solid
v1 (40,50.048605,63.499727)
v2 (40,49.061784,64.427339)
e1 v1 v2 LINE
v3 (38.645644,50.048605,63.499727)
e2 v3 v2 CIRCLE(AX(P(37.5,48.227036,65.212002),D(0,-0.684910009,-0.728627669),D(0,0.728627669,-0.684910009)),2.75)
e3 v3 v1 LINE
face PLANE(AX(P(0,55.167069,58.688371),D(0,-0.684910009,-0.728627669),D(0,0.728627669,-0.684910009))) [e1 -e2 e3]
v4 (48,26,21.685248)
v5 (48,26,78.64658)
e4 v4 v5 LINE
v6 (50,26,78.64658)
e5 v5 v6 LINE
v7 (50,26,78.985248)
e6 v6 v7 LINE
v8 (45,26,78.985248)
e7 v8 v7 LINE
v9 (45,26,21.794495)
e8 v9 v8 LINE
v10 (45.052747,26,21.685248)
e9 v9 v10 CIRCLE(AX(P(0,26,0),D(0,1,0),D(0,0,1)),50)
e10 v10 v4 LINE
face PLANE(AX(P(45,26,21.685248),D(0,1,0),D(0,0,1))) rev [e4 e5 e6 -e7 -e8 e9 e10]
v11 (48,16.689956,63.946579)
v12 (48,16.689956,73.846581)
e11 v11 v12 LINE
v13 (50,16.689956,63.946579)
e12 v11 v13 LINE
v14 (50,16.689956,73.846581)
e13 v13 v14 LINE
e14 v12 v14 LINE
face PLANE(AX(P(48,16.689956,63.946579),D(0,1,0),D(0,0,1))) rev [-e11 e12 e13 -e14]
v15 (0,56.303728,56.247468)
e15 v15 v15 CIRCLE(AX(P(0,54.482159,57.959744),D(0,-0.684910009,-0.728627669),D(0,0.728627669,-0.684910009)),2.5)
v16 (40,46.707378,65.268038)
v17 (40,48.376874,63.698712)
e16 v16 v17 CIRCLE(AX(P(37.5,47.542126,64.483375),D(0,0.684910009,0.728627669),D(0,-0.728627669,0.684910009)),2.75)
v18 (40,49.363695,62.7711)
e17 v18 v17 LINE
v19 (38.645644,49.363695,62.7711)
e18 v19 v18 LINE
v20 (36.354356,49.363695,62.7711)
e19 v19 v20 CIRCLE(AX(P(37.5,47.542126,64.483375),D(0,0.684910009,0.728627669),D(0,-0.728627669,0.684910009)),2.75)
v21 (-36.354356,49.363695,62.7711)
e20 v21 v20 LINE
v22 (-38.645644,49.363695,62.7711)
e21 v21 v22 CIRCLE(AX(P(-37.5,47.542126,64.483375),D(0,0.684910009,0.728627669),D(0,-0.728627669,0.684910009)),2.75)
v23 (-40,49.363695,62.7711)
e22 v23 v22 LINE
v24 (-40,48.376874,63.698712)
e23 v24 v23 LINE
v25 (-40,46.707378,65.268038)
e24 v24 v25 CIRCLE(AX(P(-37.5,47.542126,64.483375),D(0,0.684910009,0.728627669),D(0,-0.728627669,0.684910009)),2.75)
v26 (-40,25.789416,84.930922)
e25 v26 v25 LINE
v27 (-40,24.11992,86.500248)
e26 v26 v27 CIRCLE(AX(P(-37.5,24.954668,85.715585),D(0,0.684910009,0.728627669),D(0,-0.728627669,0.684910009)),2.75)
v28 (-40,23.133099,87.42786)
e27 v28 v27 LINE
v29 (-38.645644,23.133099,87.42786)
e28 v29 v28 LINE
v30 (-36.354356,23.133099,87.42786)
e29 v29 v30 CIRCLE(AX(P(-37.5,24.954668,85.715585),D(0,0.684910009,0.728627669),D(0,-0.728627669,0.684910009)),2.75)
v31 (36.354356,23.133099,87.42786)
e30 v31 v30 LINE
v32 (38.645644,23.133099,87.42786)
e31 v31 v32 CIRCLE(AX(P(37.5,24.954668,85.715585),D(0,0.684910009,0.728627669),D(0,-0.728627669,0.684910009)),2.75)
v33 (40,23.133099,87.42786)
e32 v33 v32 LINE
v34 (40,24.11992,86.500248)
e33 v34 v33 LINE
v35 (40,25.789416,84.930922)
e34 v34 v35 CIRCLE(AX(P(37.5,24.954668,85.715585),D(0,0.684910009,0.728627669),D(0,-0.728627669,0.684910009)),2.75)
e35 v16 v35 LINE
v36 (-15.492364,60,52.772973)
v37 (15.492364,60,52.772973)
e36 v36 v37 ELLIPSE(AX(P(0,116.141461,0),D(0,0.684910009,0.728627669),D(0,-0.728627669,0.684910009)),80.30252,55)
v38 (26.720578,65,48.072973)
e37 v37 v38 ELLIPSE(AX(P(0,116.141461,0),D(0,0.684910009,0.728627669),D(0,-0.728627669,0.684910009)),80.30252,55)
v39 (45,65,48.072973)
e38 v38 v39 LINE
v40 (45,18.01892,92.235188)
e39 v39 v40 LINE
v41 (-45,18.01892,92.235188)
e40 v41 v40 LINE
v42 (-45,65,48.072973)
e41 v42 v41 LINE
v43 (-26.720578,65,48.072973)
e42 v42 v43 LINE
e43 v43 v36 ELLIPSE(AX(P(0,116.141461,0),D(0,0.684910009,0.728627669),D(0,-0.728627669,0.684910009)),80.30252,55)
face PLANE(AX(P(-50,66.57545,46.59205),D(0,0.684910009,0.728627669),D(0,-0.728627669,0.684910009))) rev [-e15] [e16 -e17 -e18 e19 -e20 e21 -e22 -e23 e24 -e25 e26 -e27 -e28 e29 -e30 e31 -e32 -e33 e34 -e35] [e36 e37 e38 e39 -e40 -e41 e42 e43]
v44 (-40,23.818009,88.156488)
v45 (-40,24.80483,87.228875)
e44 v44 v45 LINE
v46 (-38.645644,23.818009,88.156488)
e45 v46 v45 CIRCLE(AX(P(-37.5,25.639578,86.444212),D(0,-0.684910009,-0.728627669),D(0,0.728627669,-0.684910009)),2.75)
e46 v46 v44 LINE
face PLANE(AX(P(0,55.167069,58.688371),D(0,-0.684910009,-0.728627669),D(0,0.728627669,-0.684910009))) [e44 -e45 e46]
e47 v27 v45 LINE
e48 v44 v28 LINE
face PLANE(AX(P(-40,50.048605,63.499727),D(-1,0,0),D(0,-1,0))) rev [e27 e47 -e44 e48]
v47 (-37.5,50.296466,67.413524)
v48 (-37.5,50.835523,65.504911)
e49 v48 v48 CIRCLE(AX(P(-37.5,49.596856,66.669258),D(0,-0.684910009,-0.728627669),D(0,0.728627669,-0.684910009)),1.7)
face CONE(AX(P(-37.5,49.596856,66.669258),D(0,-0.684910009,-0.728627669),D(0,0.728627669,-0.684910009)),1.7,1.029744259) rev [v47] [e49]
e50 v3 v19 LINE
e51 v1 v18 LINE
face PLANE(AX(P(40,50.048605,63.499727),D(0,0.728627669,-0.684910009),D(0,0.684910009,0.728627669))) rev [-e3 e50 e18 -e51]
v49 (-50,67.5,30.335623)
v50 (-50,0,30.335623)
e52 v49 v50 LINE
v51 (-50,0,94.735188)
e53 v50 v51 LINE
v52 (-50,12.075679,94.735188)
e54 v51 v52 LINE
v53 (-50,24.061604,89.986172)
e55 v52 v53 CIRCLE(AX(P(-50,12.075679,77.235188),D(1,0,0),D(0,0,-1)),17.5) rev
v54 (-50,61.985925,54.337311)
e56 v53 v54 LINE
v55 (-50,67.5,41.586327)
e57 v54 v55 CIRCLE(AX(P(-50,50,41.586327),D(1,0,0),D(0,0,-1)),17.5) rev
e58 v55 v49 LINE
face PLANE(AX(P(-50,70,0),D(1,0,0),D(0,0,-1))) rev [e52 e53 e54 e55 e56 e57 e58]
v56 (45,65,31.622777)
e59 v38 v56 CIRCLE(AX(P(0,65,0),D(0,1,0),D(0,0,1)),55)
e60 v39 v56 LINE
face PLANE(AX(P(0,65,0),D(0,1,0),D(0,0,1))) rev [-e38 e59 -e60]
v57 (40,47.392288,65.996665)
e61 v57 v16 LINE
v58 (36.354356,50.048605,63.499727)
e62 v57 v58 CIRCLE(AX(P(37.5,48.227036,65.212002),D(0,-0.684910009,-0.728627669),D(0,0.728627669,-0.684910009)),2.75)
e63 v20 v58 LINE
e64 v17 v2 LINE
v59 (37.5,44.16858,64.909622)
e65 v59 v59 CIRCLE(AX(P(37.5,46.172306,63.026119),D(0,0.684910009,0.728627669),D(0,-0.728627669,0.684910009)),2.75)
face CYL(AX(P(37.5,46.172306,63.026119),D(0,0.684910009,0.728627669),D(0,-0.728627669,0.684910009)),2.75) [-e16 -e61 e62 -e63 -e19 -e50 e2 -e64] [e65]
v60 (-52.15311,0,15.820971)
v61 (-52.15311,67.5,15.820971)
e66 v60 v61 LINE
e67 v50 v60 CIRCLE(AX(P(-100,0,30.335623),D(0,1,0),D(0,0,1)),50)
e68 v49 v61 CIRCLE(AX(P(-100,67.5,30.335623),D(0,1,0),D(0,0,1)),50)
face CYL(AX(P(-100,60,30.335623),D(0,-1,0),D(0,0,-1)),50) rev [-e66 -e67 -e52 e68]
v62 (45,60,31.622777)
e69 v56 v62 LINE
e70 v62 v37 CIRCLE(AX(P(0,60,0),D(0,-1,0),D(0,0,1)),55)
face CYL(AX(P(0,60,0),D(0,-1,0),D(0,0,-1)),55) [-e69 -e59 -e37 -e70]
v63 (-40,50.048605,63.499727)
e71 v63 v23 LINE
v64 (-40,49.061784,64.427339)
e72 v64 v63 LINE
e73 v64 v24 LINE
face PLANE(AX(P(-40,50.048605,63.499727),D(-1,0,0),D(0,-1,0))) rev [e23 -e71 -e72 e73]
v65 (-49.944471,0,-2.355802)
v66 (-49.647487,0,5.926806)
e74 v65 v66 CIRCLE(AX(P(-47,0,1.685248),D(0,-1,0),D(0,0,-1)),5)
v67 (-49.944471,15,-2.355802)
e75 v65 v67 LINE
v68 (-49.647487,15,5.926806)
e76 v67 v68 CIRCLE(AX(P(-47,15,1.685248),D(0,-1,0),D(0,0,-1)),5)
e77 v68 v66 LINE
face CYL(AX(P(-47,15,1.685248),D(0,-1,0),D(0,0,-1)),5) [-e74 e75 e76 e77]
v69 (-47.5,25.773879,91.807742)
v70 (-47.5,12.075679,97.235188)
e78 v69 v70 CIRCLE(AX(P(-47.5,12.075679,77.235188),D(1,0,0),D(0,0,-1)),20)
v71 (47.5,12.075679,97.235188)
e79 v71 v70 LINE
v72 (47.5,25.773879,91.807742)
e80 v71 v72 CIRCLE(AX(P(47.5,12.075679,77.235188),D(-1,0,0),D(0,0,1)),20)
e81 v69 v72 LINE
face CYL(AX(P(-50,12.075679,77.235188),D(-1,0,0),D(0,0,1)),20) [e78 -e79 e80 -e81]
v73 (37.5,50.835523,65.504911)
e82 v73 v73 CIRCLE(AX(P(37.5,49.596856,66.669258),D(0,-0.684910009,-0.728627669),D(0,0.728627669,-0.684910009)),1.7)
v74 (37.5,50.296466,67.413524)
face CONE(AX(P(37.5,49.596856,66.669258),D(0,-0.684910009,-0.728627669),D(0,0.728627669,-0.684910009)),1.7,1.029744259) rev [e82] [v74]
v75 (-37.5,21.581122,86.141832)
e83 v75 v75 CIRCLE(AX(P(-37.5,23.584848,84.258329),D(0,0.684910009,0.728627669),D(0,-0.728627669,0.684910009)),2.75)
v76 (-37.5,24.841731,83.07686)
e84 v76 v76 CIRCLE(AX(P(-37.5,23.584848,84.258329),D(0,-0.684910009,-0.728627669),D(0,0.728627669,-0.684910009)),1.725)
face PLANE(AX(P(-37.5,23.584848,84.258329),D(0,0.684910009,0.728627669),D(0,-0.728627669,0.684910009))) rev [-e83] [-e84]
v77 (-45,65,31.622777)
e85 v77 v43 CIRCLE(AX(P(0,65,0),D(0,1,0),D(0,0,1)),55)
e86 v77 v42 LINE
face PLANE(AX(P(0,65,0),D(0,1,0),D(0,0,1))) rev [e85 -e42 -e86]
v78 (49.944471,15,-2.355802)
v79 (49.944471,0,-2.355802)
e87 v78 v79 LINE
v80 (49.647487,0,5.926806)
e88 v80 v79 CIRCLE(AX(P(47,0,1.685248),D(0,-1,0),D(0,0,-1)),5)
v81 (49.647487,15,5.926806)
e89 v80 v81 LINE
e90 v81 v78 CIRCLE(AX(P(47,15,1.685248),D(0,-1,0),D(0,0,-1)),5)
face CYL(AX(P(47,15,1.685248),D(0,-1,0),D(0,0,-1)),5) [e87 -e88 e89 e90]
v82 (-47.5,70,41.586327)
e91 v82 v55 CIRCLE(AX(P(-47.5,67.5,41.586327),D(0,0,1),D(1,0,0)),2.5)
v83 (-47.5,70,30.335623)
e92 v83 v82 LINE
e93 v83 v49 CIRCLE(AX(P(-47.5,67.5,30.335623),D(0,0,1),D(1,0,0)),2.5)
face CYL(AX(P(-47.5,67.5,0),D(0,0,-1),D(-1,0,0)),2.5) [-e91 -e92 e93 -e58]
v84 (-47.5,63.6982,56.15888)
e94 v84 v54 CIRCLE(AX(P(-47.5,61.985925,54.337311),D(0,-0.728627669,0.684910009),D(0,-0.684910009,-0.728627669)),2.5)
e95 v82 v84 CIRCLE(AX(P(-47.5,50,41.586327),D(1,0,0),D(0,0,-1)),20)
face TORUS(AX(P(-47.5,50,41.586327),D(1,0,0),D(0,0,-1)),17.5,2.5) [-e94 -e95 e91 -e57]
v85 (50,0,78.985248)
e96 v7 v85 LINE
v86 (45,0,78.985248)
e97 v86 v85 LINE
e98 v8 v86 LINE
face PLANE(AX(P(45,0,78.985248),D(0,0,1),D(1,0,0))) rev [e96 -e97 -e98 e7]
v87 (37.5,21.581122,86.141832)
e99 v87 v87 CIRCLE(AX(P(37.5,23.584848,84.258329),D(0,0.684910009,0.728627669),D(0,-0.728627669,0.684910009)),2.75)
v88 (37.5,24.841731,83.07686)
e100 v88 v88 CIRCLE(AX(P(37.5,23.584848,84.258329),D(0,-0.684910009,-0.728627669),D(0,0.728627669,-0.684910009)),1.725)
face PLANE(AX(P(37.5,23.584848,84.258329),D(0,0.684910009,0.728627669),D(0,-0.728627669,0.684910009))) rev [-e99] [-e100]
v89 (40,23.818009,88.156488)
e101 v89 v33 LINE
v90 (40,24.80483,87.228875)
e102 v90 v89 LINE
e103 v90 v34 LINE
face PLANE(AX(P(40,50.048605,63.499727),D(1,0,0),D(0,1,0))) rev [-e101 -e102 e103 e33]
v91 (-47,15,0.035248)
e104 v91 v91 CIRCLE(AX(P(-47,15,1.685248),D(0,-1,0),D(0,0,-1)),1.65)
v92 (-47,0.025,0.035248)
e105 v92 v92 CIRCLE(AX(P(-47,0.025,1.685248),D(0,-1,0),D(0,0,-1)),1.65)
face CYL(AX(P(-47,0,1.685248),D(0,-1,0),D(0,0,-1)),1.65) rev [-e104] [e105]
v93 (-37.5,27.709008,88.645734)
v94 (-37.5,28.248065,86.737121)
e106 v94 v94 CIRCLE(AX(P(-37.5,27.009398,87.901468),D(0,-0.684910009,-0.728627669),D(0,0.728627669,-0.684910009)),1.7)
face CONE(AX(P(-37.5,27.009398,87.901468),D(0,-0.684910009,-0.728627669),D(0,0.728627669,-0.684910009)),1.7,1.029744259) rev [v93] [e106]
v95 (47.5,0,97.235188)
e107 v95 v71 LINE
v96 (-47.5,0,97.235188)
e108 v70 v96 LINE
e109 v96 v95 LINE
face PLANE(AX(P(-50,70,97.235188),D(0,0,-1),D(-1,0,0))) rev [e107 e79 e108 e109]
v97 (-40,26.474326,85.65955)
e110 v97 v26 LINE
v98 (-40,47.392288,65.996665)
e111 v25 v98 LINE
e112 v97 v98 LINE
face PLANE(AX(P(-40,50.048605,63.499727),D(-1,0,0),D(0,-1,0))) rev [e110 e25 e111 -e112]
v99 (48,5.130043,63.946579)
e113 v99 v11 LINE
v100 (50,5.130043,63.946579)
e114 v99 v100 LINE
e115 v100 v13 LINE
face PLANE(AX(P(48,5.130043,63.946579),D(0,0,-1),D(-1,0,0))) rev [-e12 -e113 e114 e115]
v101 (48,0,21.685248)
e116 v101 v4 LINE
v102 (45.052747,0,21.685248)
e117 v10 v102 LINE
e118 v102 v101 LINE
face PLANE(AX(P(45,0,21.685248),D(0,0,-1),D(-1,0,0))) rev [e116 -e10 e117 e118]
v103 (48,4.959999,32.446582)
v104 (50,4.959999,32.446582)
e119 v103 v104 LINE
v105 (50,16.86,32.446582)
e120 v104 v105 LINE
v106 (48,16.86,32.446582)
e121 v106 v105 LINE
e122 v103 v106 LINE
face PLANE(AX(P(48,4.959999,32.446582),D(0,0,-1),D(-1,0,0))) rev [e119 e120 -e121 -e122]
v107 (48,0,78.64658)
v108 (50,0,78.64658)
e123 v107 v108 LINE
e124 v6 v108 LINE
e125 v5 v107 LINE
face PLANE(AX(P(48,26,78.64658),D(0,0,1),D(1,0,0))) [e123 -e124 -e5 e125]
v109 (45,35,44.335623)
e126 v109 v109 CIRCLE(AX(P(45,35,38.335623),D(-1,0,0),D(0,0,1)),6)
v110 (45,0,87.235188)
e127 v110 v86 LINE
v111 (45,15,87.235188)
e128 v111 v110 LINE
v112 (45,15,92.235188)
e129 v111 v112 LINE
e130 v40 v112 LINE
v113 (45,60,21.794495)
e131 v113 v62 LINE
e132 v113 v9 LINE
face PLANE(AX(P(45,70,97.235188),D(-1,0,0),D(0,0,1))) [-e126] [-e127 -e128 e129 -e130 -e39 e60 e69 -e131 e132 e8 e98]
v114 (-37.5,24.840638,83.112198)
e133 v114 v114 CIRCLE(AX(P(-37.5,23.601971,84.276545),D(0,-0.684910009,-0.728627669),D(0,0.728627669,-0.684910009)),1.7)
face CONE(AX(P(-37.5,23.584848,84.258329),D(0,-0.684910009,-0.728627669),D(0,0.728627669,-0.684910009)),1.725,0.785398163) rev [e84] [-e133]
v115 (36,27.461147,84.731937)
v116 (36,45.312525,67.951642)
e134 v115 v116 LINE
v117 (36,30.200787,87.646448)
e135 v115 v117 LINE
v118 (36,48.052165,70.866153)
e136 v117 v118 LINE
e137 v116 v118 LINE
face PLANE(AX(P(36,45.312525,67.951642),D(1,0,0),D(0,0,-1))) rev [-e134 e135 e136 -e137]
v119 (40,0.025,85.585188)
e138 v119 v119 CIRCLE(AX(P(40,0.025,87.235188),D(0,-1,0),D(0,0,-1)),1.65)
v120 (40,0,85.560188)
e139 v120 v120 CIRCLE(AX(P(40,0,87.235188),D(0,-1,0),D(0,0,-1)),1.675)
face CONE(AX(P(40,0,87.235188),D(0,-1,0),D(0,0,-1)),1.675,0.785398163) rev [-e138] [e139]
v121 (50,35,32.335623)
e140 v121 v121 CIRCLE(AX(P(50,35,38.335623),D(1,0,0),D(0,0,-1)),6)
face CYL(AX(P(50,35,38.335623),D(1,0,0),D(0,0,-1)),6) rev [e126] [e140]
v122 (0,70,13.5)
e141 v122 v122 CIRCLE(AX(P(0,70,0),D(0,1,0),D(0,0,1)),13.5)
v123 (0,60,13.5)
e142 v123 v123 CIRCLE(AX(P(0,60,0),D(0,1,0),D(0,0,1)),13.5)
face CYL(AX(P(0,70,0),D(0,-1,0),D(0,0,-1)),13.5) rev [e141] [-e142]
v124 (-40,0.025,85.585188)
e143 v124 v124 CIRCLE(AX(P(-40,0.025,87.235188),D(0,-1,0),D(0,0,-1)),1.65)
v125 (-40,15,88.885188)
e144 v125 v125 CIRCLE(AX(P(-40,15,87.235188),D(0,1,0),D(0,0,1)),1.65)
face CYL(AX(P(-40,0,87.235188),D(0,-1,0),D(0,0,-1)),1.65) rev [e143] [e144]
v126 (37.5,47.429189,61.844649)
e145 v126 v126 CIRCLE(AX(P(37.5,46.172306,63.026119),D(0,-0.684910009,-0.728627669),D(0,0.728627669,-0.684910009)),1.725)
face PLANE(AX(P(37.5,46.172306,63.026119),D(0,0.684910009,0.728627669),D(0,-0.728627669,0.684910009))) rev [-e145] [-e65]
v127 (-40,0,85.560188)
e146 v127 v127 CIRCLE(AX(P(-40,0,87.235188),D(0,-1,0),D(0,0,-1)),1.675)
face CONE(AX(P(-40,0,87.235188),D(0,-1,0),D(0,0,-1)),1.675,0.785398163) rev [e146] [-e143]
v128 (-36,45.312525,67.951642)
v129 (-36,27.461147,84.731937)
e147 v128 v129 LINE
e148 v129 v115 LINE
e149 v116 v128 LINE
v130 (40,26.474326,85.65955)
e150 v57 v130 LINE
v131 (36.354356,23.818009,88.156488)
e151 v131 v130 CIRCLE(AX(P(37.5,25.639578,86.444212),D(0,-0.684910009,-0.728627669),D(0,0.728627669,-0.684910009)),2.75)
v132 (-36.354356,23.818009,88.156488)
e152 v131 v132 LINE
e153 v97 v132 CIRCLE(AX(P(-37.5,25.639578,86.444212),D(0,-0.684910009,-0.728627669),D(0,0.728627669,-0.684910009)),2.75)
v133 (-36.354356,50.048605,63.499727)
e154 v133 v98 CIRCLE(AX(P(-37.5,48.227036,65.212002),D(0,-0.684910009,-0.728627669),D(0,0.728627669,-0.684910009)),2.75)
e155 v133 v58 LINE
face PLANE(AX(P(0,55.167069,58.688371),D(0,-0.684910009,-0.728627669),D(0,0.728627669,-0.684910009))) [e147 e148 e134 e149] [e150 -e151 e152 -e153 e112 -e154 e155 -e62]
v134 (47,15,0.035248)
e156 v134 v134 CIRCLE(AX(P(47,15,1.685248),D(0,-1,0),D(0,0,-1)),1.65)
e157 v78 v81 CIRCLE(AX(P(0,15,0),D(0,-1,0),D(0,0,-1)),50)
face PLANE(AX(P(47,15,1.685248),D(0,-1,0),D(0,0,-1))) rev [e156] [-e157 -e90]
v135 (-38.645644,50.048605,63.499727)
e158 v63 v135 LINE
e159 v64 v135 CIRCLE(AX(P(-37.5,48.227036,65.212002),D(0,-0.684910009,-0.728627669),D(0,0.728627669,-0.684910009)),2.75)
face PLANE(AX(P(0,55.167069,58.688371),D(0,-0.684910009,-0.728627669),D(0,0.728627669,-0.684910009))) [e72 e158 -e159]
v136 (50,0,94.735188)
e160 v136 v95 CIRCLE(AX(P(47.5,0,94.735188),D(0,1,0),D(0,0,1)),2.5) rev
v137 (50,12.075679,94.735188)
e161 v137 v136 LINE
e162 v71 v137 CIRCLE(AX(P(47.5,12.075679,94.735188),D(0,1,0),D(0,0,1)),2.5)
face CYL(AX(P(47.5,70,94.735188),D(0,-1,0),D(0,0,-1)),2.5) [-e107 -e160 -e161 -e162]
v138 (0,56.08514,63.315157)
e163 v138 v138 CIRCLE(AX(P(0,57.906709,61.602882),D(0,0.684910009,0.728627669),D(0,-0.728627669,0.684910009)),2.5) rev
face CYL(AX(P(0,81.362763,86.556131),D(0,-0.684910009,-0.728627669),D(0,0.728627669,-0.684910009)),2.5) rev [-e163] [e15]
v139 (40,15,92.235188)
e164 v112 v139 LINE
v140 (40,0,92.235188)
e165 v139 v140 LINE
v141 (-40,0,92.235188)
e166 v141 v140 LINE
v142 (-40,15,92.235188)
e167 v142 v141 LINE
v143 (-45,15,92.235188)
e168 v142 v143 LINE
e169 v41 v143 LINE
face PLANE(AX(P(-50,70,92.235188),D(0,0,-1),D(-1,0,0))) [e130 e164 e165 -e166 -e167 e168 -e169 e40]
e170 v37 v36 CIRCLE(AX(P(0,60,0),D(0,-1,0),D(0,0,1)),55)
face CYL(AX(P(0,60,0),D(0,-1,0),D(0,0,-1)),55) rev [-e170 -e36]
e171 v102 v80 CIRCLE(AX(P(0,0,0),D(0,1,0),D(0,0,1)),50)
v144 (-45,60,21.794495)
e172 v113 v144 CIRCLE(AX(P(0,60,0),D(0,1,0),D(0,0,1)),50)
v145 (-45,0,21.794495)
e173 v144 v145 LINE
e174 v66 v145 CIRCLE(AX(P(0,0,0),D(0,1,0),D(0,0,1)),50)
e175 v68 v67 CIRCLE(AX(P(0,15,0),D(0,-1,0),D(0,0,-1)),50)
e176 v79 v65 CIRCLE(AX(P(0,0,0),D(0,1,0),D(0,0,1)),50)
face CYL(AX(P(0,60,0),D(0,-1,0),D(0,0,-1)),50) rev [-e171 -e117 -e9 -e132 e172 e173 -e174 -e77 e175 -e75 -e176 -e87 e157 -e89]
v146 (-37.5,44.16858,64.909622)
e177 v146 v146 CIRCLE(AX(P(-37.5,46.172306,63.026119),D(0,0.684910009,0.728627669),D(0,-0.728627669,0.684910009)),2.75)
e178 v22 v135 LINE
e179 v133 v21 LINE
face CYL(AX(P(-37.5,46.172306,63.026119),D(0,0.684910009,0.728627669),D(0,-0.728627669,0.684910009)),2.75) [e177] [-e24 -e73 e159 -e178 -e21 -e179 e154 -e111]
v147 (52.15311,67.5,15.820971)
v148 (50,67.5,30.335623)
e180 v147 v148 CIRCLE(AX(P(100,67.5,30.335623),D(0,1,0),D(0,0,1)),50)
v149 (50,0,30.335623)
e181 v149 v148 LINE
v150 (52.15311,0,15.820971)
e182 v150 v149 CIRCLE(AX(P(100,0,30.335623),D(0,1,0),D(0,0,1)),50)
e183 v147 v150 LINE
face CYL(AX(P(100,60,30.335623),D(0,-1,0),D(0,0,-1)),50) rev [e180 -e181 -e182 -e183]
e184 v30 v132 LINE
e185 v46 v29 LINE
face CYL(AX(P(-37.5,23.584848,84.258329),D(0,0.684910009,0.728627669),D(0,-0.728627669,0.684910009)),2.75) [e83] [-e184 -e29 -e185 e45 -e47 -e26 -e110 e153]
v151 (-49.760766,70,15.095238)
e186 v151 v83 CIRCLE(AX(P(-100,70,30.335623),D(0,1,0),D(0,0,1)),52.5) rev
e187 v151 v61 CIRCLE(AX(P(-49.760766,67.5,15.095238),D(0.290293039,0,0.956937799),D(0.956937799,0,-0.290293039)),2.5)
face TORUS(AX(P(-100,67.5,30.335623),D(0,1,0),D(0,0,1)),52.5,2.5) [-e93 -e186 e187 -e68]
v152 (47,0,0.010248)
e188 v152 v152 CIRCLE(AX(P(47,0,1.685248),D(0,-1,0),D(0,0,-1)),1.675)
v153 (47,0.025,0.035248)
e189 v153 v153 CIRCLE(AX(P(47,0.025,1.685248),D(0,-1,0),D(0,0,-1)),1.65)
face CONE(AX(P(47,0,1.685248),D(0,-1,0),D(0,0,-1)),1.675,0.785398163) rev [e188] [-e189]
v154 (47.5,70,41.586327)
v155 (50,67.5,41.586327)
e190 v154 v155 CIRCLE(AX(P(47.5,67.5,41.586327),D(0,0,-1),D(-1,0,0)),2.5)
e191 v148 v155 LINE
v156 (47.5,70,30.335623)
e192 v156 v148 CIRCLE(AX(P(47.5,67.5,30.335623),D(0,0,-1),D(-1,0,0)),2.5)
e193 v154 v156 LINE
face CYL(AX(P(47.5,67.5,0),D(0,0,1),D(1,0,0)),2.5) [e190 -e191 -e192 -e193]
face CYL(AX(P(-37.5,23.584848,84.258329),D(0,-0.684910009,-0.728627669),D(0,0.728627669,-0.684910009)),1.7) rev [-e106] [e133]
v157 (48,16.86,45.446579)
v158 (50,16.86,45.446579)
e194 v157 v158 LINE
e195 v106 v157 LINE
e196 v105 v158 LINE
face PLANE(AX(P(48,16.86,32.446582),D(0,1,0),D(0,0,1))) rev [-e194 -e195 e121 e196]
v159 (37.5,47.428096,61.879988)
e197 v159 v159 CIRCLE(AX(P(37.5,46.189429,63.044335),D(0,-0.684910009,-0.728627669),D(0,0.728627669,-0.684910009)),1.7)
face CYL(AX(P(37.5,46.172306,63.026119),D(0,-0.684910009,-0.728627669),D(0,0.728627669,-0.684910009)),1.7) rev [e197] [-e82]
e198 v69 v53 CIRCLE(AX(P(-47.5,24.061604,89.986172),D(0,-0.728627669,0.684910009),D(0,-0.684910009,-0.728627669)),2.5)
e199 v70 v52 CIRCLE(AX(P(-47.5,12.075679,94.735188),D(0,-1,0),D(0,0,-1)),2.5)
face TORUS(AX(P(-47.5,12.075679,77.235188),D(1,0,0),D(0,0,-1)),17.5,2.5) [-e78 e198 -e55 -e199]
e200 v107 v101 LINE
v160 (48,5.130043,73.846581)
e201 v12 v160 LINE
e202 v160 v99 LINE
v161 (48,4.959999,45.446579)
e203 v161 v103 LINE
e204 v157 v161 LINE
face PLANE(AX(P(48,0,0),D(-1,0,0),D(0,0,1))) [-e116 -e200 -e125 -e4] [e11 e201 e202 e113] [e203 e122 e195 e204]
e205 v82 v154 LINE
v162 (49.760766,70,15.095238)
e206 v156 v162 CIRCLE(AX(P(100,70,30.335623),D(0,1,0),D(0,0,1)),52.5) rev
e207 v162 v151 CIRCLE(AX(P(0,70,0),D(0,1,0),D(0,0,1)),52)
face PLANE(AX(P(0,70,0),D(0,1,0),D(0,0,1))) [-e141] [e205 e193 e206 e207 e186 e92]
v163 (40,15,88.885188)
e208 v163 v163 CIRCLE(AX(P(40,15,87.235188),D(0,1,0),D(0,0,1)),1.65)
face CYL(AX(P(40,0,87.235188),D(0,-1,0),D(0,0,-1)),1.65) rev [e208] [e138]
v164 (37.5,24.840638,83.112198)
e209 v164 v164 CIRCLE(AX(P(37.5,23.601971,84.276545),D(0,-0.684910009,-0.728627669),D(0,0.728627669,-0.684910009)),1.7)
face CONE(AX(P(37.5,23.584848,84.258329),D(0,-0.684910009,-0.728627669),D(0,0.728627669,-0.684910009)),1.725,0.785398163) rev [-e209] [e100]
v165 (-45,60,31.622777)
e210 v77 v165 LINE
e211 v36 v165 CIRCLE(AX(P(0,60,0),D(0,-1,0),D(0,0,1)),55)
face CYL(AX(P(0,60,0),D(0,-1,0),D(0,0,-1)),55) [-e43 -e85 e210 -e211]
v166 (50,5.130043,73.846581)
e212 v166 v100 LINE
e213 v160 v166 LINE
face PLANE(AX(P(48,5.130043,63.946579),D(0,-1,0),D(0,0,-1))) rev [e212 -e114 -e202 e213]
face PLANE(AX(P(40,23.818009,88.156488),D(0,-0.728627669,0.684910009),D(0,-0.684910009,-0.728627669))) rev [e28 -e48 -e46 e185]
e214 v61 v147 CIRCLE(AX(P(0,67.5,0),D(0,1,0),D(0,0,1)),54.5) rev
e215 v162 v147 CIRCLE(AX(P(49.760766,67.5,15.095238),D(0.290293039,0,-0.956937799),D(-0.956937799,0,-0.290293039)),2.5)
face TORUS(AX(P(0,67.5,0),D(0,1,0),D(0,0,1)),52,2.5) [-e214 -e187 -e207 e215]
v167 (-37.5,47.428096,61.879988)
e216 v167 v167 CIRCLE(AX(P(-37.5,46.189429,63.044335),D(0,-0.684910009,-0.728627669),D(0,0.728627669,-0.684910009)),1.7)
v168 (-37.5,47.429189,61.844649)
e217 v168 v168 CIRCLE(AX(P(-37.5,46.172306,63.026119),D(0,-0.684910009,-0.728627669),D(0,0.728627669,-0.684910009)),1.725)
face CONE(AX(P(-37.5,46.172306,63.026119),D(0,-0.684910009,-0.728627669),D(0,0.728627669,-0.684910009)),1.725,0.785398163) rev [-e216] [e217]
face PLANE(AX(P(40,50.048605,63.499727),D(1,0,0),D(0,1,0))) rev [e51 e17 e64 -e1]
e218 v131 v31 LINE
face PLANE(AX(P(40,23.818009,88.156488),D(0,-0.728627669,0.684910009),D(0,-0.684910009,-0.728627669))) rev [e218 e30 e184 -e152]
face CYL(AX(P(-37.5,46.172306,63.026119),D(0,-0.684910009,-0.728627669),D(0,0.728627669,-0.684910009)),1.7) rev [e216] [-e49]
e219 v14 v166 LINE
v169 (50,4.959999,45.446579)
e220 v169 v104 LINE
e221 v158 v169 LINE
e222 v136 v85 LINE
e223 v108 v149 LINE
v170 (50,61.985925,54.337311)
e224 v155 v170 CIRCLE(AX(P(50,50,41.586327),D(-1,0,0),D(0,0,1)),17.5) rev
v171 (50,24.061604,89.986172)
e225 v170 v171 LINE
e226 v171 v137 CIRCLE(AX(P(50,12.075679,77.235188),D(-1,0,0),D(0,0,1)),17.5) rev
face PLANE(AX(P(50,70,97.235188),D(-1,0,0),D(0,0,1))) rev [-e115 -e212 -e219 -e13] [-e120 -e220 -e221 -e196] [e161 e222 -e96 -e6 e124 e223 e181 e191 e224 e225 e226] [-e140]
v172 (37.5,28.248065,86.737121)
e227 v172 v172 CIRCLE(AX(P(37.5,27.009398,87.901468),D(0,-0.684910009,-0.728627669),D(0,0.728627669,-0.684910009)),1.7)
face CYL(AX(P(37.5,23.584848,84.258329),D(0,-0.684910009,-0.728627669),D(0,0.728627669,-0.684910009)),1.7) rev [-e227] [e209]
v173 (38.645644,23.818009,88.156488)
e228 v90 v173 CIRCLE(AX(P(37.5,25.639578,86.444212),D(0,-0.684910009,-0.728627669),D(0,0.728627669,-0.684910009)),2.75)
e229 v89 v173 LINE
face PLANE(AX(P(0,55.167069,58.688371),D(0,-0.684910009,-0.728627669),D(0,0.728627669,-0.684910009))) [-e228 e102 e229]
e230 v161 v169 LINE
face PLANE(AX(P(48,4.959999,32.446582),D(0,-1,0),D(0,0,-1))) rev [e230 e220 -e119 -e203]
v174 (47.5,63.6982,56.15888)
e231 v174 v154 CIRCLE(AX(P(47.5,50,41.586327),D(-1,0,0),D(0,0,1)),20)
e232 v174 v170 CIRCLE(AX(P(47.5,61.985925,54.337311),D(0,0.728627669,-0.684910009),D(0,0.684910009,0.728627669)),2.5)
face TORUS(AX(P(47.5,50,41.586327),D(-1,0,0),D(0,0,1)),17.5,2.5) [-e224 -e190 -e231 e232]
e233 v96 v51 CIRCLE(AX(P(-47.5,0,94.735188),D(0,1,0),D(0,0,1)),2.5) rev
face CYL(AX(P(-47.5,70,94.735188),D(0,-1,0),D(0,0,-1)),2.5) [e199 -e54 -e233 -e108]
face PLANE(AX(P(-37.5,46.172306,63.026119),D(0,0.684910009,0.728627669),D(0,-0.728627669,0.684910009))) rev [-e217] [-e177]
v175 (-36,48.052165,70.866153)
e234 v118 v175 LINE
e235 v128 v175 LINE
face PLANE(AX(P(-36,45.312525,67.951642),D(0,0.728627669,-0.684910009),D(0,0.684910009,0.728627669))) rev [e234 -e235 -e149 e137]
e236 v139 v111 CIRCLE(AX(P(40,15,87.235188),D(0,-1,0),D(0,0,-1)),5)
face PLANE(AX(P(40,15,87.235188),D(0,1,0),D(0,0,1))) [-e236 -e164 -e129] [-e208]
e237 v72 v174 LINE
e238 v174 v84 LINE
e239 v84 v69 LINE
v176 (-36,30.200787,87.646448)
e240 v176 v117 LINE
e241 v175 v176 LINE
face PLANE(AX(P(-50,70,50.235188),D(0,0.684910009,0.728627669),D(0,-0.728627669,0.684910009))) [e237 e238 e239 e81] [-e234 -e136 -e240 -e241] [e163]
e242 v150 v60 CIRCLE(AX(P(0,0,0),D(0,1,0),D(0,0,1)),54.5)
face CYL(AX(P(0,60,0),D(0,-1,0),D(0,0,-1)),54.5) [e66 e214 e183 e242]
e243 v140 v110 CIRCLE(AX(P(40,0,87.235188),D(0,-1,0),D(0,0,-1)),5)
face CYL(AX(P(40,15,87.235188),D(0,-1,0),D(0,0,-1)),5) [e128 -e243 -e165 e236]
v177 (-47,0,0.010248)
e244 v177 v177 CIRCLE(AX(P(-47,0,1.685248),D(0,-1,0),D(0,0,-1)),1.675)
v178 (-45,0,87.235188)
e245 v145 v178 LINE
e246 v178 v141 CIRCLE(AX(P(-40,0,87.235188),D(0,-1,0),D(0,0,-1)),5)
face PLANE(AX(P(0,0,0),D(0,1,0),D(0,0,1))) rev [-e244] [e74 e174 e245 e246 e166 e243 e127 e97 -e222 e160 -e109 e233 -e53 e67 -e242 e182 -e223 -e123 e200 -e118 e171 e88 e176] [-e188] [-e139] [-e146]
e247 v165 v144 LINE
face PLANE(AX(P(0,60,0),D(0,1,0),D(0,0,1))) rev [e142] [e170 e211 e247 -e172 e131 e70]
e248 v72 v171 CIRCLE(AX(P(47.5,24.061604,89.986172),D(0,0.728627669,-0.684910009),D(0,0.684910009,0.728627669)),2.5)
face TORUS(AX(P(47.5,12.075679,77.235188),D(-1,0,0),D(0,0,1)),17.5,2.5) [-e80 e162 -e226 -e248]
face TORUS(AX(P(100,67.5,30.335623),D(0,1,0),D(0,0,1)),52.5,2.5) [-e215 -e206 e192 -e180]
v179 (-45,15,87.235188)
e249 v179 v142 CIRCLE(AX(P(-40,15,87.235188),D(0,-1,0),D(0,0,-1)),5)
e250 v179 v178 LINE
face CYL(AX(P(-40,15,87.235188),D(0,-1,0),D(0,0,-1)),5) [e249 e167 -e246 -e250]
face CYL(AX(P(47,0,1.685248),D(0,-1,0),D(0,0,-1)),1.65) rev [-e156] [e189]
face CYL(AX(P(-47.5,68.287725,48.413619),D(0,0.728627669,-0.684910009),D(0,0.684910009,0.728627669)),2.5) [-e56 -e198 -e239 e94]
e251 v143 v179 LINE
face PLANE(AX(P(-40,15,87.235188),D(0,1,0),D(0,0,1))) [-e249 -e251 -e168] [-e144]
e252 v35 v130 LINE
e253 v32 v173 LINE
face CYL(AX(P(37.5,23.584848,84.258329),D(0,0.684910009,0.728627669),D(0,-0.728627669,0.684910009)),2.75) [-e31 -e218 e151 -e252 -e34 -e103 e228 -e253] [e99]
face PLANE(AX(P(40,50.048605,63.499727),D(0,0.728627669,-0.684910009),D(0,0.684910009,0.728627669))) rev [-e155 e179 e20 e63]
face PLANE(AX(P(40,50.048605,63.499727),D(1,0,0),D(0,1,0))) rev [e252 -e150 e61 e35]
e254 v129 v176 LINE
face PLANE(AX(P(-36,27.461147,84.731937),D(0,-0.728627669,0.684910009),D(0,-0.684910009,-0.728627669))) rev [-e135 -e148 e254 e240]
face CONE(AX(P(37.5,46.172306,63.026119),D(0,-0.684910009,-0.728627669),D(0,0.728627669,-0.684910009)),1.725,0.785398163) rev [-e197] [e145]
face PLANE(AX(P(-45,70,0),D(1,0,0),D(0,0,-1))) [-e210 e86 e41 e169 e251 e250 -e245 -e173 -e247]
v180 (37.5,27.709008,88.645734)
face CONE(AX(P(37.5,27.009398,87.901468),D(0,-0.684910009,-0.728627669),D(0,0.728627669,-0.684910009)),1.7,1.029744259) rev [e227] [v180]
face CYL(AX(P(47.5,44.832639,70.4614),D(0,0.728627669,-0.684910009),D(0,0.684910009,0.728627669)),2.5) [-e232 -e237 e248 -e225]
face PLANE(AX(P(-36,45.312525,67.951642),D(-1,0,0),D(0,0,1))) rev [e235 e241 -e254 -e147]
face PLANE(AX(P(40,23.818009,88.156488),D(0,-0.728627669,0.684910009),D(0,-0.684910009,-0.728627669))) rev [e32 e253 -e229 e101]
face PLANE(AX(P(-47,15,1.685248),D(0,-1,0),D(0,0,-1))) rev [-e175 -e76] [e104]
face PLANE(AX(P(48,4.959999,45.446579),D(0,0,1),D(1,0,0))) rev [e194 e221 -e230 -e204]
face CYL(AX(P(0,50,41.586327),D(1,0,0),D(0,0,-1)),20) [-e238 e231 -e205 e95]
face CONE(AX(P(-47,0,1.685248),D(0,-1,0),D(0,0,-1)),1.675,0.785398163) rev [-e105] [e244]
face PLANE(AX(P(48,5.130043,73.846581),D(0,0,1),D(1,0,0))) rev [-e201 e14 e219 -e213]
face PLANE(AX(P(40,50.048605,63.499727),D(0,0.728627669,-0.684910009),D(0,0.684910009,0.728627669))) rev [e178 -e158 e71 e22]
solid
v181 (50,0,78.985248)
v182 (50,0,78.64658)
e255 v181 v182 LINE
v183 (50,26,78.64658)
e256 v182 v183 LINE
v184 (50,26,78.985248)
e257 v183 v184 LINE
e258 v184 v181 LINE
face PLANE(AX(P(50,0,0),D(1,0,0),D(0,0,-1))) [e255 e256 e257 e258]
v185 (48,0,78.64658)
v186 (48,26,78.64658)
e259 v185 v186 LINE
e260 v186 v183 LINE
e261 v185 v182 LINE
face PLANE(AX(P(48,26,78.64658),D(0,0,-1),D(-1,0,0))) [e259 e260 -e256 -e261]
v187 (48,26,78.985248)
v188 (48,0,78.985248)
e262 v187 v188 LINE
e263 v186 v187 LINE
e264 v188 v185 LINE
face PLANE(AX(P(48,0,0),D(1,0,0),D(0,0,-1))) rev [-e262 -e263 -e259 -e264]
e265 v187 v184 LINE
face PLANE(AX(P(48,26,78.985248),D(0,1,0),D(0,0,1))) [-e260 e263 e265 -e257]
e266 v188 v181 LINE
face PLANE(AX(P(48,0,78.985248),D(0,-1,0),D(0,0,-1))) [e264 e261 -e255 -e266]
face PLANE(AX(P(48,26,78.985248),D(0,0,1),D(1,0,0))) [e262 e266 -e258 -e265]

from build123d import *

# Parameters (mm, degrees)
SKETCH1_R                             = 54.5
SKETCH1_R_2                           = 50
BOSS_EXTRUDE1_DEPTH                   = 60
SKETCH2_R                             = 54.5
SKETCH2_R_2                           = 13.5
BOSS_EXTRUDE2_DEPTH                   = 10
BOSS_EXTRUDE4_DEPTH                   = 70
CUT_EXTRUDE3_DEPTH                    = 100
SHELL1_DEPTH                          = 65
SHELL1_START                          = 79.546448744
SHELL1_2_OUTLINE_W                    = 92
SHELL1_2_OUTLINE_H                    = 68
SHELL1_2_DEPTH                        = 5
CUT_EXTRUDE4_DEPTH                    = 60
SKETCH12_W                            = 72
SKETCH12_H                            = 24.5
CUT_EXTRUDE5_DEPTH                    = 4
SKETCH13_W                            = 80
SKETCH13_H                            = 36
CUT_EXTRUDE6_DEPTH                    = 1
SKETCH15_R                            = 2.75
BOSS_EXTRUDE5_DEPTH                   = 7
M3_CLEARANCE_HOLE1_D                  = 3.4
M3_CLEARANCE_HOLE1_DEPTH              = 5
M3_CLEARANCE_HOLE1_CSINK_D            = 3.45
M3_CLEARANCE_HOLE1_CSINK_ANGLE        = 90
M3_CLEARANCE_HOLE1_TIP                = 1.021463052
SKETCH19_R                            = 5
BOSS_EXTRUDE6_DEPTH                   = 15
BOSS_EXTRUDE6_2_DEPTH                 = 15
BOSS_EXTRUDE7_DEPTH                   = 15
SKETCH21_R                            = 5
BOSS_EXTRUDE8_DEPTH                   = 15
TAP_DRILL_FOR_M4X0_7_TAP1_D           = 3.3
TAP_DRILL_FOR_M4X0_7_TAP1_DEPTH       = 15
TAP_DRILL_FOR_M4X0_7_TAP1_CSINK_D     = 3.35
TAP_DRILL_FOR_M4X0_7_TAP1_CSINK_ANGLE = 90
SKETCH24_W                            = 57.3
SKETCH24_H                            = 26
CUT_EXTRUDE7_DEPTH                    = 5
SKETCH25_W                            = 57.3
SKETCH25_H                            = 26
SKETCH25_W_2                          = 12.999996543
SKETCH25_H_2                          = 11.900000274
SKETCH25_W_3                          = 9.900001809
SKETCH25_H_3                          = 11.55991244
BOSS_EXTRUDE9_DEPTH                   = 2
SKETCH26_W                            = 0.338668116
SKETCH26_H                            = 26
BOSS_EXTRUDE10_DEPTH                  = 2
FILLET1_R                             = 50
FILLET2_R                             = 20
FILLET3_R                             = 20
FILLET4_R                             = 2.5
SKETCH27_R                            = 2.5
CUT_EXTRUDE8_DEPTH                    = 5
SKETCH30_W                            = 6
SKETCH30_H                            = 5.001


with BuildPart() as part:
    # Sketch1 → Boss-Extrude1 (new body)
    with BuildSketch(Plane(origin=(0, 0, 0), x_dir=(1, 0, 0), z_dir=(0, 1, 0))):
        with Locations(Location((0, 0, 0), (0, 0, 270))):
            Circle(SKETCH1_R)
        with Locations(Location((0, 0, 0), (0, 0, 270))):
            Circle(SKETCH1_R_2, mode=Mode.SUBTRACT)
    extrude(amount=BOSS_EXTRUDE1_DEPTH)

    # Sketch2 → Boss-Extrude2 (add)
    with BuildSketch(Plane(origin=(0, 60, 0), x_dir=(1, 0, 0), z_dir=(0, 1, 0))):
        with Locations(Location((0, 0, 0), (0, 0, 270))):
            Circle(SKETCH2_R)
        with Locations(Location((0, 0, 0), (0, 0, 270))):
            Circle(SKETCH2_R_2, mode=Mode.SUBTRACT)
    extrude(amount=BOSS_EXTRUDE2_DEPTH)

    # Sketch3 → Boss-Extrude4 (add)
    with BuildSketch(Plane.XZ):
        with BuildLine():
            Line((-50, 0), (-50, 97.235188276))
            Line((-50, 97.235188276), (50, 97.235188276))
            Line((50, 97.235188276), (50, 0))
            ThreePointArc((50, 0), (0, 50), (-50, 0))
        make_face()
    extrude(amount=-BOSS_EXTRUDE4_DEPTH)

    # Sketch4 → Cut-Extrude3 (cut)
    with BuildSketch(Plane(origin=(50, 0, 0), x_dir=(0, 0, -1), z_dir=(1, 0, 0))):
        Polygon((-97.235188276, 70), (-97.235188276, 20), (-50.235188276, 70), align=None)
    extrude(amount=-CUT_EXTRUDE3_DEPTH, mode=Mode.SUBTRACT)

    # Shell1: read off the stored shape, not the designer's step
    # Shell1 outline → Shell1 (cut)
    with BuildSketch(Plane(origin=(0, 0, 0), x_dir=(1, 0, 0), z_dir=(0, 1, 0))):
        with BuildLine():
            Line((45, -92.235188276), (45, -31.622776602))
            ThreePointArc((45, -31.622776602), (0, -55), (-45, -31.622776602))
            Line((-45, -31.622776602), (-45, -92.235188276))
            Line((-45, -92.235188276), (45, -92.235188276))
        make_face()
    extrude(amount=SHELL1_DEPTH, mode=Mode.SUBTRACT)

    # Shell1 2 outline → Shell1 2 (add)
    with BuildSketch(Plane(origin=(0, 0, 0), x_dir=(1, 0, 0), z_dir=(0, 0.6849100087678871, 0.7286276689020071)).offset(SHELL1_START)):
        with Locations((0, -18)):
            Rectangle(SHELL1_2_OUTLINE_W, SHELL1_2_OUTLINE_H)
    extrude(amount=SHELL1_2_DEPTH)

    # Sketch5 → Cut-Extrude4 (cut)
    with BuildSketch(Plane.XZ):
        with BuildLine():
            Line((-45, 31.622776602), (-45, 21.794494718))
            ThreePointArc((-45, 21.794494718), (0, 50), (45, 21.794494718))
            Line((45, 21.794494718), (45, 31.622776602))
            ThreePointArc((45, 31.622776602), (0, 55), (-45, 31.622776602))
        make_face()
    extrude(amount=-CUT_EXTRUDE4_DEPTH, mode=Mode.SUBTRACT)

    # Sketch12 → Cut-Extrude5 (cut)
    with BuildSketch(Plane(origin=(0, 57.906708951, 61.602881862), x_dir=(1, 0, 0), z_dir=(0, 0.6849100087678871, 0.7286276689020071))):
        with Locations((0, -25.774800277)):
            Rectangle(SKETCH12_W, SKETCH12_H)
    extrude(amount=-CUT_EXTRUDE5_DEPTH, mode=Mode.SUBTRACT)

    # Sketch13 → Cut-Extrude6 (cut)
    with BuildSketch(Plane(origin=(0, 54.482158907, 57.959743518), x_dir=(-1, 0, 0), z_dir=(0, -0.6849100087678871, -0.7286276689020071))):
        with Locations((0, -25.024800277)):
            Rectangle(SKETCH13_W, SKETCH13_H)
    extrude(amount=-CUT_EXTRUDE6_DEPTH, mode=Mode.SUBTRACT)

    # Sketch15 → Boss-Extrude5 (add)
    with BuildSketch(Plane(origin=(0, 57.906708951, 61.602881862), x_dir=(1, 0, 0), z_dir=(0, 0.6849100087678871, 0.7286276689020071))):
        with Locations(Location((-37.5, -9.524800277, 0), (0, 0, 270))):
            Circle(SKETCH15_R)
        with Locations(Location((37.5, -9.524800277, 0), (0, 0, 270))):
            Circle(SKETCH15_R)
        with Locations(Location((-37.5, -40.524800277, 0), (0, 0, 270))):
            Circle(SKETCH15_R)
        with Locations(Location((37.5, -40.524800277, 0), (0, 0, 270))):
            Circle(SKETCH15_R)
    extrude(amount=-BOSS_EXTRUDE5_DEPTH)

    # M3 Clearance Hole1
    with Locations(Plane(origin=(0, 53.112338889, 56.50248818), x_dir=(-1, 0, 0), z_dir=(0, -0.6849100087678871, -0.728627668902007))):
        with Locations((-37.5, -9.524800277), (37.5, -9.524800277), (37.5, -40.524800277), (-37.5, -40.524800277)):
            CounterSinkHole(M3_CLEARANCE_HOLE1_D / 2, M3_CLEARANCE_HOLE1_CSINK_D / 2, depth=M3_CLEARANCE_HOLE1_DEPTH, counter_sink_angle=M3_CLEARANCE_HOLE1_CSINK_ANGLE)
            with Locations((0, 0, -(M3_CLEARANCE_HOLE1_DEPTH + M3_CLEARANCE_HOLE1_TIP / 2))):  # 118° drill point
                Cone(0, M3_CLEARANCE_HOLE1_D / 2, M3_CLEARANCE_HOLE1_TIP, mode=Mode.SUBTRACT)



with BuildPart() as body_2:
    # Sketch19 → Boss-Extrude6 (new body)
    with BuildSketch(Plane(origin=(0, 0, 0), x_dir=(-1, 0, 0), z_dir=(0, -1, 0))):
        with Locations(Location((40, -87.235188276, 0), (0, 0, 90))):
            Circle(SKETCH19_R)
    extrude(amount=-BOSS_EXTRUDE6_DEPTH)


with BuildPart() as body_3:
    # Sketch19 → Boss-Extrude6 2 (new body)
    with BuildSketch(Plane(origin=(0, 0, 0), x_dir=(-1, 0, 0), z_dir=(0, -1, 0))):
        with Locations(Location((-40, -87.235188276, 0), (0, 0, 90))):
            Circle(SKETCH19_R)
    extrude(amount=-BOSS_EXTRUDE6_2_DEPTH)


with BuildPart() as part_1:
    add(part.part)

    add(body_2.part)  # Boss-Extrude7 merges body 2

    add(body_3.part)  # Boss-Extrude7 merges body 3
    # Sketch20 → Boss-Extrude7 (add)
    with BuildSketch(Plane.XZ):
        with BuildLine():
            Line((-40, 92.235188276), (-45, 92.235188276))
            Line((-45, 92.235188276), (-45, 87.235188276))
            ThreePointArc((-45, 87.235188276), (-43.535533906, 90.770722182), (-40, 92.235188276))
        make_face()
        with BuildLine():
            Line((40, 92.235188276), (45, 92.235188276))
            Line((45, 92.235188276), (45, 87.235188276))
            ThreePointArc((45, 87.235188276), (43.535533906, 90.770722182), (40, 92.235188276))
        make_face()
    extrude(amount=-BOSS_EXTRUDE7_DEPTH)

    # Sketch21 → Boss-Extrude8 (add)
    with BuildSketch(Plane.XZ):
        with Locations((47, 1.685248442)):
            Circle(SKETCH21_R)
        with Locations((-47, 1.685248442)):
            Circle(SKETCH21_R)
    extrude(amount=-BOSS_EXTRUDE8_DEPTH)

    # Tap Drill for M4x0.7 Tap1
    with Locations(Plane(origin=(-47, 0, 1.685248442), x_dir=(0, 0, -1), z_dir=(0, -1, 0))):
        with Locations((0, 0), (0, 94), (-85.549939834, 87), (-85.549939834, 7)):
            CounterSinkHole(TAP_DRILL_FOR_M4X0_7_TAP1_D / 2, TAP_DRILL_FOR_M4X0_7_TAP1_CSINK_D / 2, depth=TAP_DRILL_FOR_M4X0_7_TAP1_DEPTH, counter_sink_angle=TAP_DRILL_FOR_M4X0_7_TAP1_CSINK_ANGLE)

    # Sketch24 → Cut-Extrude7 (cut)
    with BuildSketch(Plane(origin=(50, 0, 0), x_dir=(0, 0, -1), z_dir=(1, 0, 0))):
        with Locations((-50.335248442, 13)):
            Rectangle(SKETCH24_W, SKETCH24_H)
    extrude(amount=-CUT_EXTRUDE7_DEPTH, mode=Mode.SUBTRACT)

    # Sketch25 → Boss-Extrude9 (add)
    with BuildSketch(Plane(origin=(50, 0, 50), x_dir=(0, 0, 1), z_dir=(1, 0, 0))):
        with Locations((-0.003419674, -13)):
            Rectangle(SKETCH25_W, SKETCH25_H)
        with Locations((-11.053419289, -10.90999946)):
            Rectangle(SKETCH25_W_2, SKETCH25_H_2, mode=Mode.SUBTRACT)
        with Locations((18.896580125, -10.90999946)):
            Rectangle(SKETCH25_W_3, SKETCH25_H_3, mode=Mode.SUBTRACT)
    extrude(amount=-BOSS_EXTRUDE9_DEPTH)

    # Fillet1
    fillet1_edges = [part_1.edges().sort_by_distance(p)[0] for p in [
        (50, 35, 21.685248442),
        (-50, 35, 21.685248442),
    ]]
    fillet(fillet1_edges, radius=FILLET1_R)

    # Fillet2
    fillet2_edges = [part_1.edges().sort_by_distance(p)[0] for p in [
        (0, 20, 97.235188276),
    ]]
    fillet(fillet2_edges, radius=FILLET2_R)

    # Fillet3
    fillet3_edges = [part_1.edges().sort_by_distance(p)[0] for p in [
        (0, 70, 50.235188276),
    ]]
    fillet(fillet3_edges, radius=FILLET3_R)

    # Fillet4
    fillet4_edges = [part_1.edges().sort_by_distance(p)[0] for p in [
        (0, 70, -54.5),
        (-50, 70, 35.960974679),
        (50.541206557, 70, 22.998882804),
        (-50.541206557, 70, 22.998882804),
        (50, 6.037839605, 97.235188276),
        (50, 19.442799829, 95.828884352),
        (-50, 6.037839605, 97.235188276),
        (-50, 19.442799829, 95.828884352),
        (50, 70, 35.960974679),
        (50, 44.73603978, 73.983310883),
        (50, 68.357069531, 49.524714368),
        (-50, 44.73603978, 73.983310883),
        (-50, 68.357069531, 49.524714368),
    ]]
    fillet(fillet4_edges, radius=FILLET4_R)

    # Sketch27 → Cut-Extrude8 (cut)
    with BuildSketch(Plane(origin=(0, 54.482158907, 57.959743518), x_dir=(-1, 0, 0), z_dir=(0, -0.6849100087678871, -0.7286276689020071))):
        with Locations(Location((0, 0, 0), (0, 0, 90))):
            Circle(SKETCH27_R)
    extrude(amount=-CUT_EXTRUDE8_DEPTH, mode=Mode.SUBTRACT)

    # Sketch30 → Hole1 (revolve, cut)
    with BuildSketch(Plane(origin=(50, 35, 38.335622624), x_dir=(0, 0, -1), z_dir=(0, 1, 0))):
        with Locations((3, 2.5005)):
            Rectangle(SKETCH30_W, SKETCH30_H)
    revolve(axis=Axis((-60, 35, 38.335622624), (1, 0, 0)), mode=Mode.SUBTRACT)


with BuildPart() as body_2_2:
    # Sketch26 → Boss-Extrude10 (new body)
    with BuildSketch(Plane(origin=(50, 0, 0), x_dir=(0, 0, -1), z_dir=(1, 0, 0))):
        with Locations((-78.815914384, 13)):
            Rectangle(SKETCH26_W, SKETCH26_H)
    extrude(amount=-BOSS_EXTRUDE10_DEPTH)


solid = Compound([part_1.part, body_2_2.part])
